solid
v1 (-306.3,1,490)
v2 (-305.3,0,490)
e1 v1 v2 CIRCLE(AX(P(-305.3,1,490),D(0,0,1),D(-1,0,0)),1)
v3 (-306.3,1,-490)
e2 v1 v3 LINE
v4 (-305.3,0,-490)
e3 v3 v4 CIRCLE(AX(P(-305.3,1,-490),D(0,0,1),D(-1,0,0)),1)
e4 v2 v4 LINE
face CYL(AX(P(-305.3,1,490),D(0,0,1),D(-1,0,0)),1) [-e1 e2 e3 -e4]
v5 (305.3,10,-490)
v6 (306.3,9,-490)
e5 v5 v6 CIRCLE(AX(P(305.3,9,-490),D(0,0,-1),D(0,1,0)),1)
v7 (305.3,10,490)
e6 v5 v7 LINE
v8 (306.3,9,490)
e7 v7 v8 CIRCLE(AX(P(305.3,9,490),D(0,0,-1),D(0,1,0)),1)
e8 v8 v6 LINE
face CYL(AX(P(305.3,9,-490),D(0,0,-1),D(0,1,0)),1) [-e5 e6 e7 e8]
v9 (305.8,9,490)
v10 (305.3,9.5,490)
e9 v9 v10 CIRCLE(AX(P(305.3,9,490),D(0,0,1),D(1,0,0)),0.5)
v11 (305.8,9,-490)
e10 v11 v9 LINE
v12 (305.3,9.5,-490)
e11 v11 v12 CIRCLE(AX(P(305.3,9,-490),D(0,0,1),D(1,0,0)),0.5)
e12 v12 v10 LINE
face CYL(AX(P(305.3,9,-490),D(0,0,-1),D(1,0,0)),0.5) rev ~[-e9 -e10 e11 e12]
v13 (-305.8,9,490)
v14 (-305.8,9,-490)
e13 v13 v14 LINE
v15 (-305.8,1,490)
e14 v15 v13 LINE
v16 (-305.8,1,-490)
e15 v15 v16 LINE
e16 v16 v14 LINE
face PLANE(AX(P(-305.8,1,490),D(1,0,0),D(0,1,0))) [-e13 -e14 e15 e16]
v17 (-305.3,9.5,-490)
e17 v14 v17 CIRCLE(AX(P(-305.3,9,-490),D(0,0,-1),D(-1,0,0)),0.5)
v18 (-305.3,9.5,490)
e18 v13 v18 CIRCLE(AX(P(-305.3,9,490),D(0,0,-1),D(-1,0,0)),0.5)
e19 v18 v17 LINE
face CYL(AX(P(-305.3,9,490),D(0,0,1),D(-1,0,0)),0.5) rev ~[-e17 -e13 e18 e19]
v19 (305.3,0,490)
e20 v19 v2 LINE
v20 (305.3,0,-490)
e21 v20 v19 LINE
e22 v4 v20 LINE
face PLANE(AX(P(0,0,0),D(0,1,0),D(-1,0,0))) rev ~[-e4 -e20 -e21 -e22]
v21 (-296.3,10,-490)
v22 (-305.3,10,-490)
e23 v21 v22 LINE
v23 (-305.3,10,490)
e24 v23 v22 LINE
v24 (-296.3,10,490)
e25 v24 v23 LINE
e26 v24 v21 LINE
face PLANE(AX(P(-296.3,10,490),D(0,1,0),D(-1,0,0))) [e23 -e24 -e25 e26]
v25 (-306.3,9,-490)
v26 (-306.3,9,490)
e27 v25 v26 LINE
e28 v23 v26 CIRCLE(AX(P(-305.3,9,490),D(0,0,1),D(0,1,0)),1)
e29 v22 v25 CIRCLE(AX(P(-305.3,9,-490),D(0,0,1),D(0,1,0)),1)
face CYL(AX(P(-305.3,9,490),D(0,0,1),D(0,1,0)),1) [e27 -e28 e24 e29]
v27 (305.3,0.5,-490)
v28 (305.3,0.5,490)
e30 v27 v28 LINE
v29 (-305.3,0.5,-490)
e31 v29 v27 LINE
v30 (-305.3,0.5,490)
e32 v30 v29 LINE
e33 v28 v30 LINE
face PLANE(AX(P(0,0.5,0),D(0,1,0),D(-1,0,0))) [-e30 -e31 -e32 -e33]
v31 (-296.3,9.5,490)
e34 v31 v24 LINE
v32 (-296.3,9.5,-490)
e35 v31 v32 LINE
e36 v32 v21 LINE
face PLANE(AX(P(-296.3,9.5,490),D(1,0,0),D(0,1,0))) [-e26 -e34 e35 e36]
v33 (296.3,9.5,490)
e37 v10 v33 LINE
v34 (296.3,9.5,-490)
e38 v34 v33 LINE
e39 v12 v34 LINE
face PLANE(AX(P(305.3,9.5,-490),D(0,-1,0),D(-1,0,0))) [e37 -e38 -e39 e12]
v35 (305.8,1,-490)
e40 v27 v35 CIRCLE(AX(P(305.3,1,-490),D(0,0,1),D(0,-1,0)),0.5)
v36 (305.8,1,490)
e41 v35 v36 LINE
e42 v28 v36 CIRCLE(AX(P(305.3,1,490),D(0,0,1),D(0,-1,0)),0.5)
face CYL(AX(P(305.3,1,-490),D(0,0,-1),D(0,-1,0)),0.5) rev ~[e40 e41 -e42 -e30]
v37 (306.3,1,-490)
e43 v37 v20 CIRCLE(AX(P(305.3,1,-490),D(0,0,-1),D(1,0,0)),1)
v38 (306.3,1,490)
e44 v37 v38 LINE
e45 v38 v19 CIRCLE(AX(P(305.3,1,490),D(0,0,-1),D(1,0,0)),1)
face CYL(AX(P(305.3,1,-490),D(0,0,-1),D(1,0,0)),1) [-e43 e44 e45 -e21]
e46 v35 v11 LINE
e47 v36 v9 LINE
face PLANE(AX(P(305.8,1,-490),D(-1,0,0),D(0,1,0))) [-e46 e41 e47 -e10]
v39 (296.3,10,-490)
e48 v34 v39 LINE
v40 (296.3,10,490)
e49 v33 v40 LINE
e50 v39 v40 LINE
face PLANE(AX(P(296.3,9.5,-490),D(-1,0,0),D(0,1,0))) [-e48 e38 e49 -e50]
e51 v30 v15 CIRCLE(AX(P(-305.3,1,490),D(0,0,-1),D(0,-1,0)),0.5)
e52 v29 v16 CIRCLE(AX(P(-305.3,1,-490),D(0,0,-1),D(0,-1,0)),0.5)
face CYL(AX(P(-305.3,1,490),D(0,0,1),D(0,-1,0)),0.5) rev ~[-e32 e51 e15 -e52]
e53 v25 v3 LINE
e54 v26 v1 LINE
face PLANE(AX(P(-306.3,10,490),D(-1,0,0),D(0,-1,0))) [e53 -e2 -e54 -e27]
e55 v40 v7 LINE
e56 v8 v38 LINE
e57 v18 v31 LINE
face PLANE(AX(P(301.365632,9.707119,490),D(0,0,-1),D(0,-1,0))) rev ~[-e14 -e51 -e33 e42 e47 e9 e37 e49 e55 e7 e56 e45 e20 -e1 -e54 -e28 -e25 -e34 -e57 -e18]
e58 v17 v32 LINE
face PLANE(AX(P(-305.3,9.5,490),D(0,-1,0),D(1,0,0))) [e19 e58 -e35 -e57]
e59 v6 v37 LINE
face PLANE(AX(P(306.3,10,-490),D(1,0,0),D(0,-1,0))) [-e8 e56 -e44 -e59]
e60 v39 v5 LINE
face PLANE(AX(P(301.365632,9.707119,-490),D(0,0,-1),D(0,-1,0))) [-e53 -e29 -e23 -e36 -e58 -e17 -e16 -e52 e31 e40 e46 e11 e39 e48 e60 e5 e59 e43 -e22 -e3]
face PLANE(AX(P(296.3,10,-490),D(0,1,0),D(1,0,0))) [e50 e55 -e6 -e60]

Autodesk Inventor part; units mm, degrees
ref_plane "YZ Plane" through (0, 0, 0) normal (1, 0, 0) x (0, 1, 0)
ref_plane "XZ Plane" through (0, 0, 0) normal (0, 1, 0) x (-1, 0, 0)
ref_plane "XY Plane" through (0, 0, 0) normal (0, 0, 1) x (1, 0, 0)
sketch "Sketch6" plane through (0, 0, 0) normal (0, 1, 0) x (-1, 0, 0)
  line L0 (306.3, -490) -> (-306.3, -490)
  line L1 (-306.3, -490) -> (-306.3, 490)
  line L2 (-306.3, 490) -> (306.3, 490)
  line L3 (306.3, 490) -> (306.3, -490)
  line L4 (306.3, -490) -> (-306.3, 490) construction
  line L5 (-306.3, -490) -> (306.3, 490) construction
  point P0 (0, 0)
  dimension "d52" = 612.6
  dimension "d53" = 980
extrude "Plate2" add sketch "Sketch6" along normal blind 0.5
sketch "Sketch11" plane through (-305.8, 0, 490) normal (-1, 0, 0) x (0, -1, 0)
  line L0 (0, -980) -> (0, 0)
  line L1 (0, 0) -> (-10, 0)
  line L2 (-10, 0) -> (-10, -980)
  line L3 (-10, -980) -> (0, -980)
edge flange "Flange2" height 10 angle 90 thickness 0.5 bend radius 0.5 thickness toward (-1, 0, 0) relief tear relief width 0.5 relief depth 0.25 edges at (-306.3, 0.5, 0) wall of the first edge with corners at (-305.8, 0, -490) (-305.8, 0, 490) (-305.8, 10, 490) (-305.8, 10, -490)
bend "Bend3"
corner "Corner3"
sketch "Sketch12" plane through (-306.3, 9.5, 490) normal (0, 1, 0) x (-1, 0, 0)
  line L0 (0, -980) -> (0, 0)
  line L1 (0, 0) -> (-10, 0)
  line L2 (-10, 0) -> (-10, -980)
  line L3 (-10, -980) -> (0, -980)
edge flange "Flange3" height 10 angle 90 thickness 0.5 bend radius 0.5 thickness toward (0, 1, 0) relief tear relief width 0.5 relief depth 0.25 edges at (-305.8, 10, 0) wall of the first edge with corners at (-306.3, 9.5, -490) (-306.3, 9.5, 490) (-296.3, 9.5, 490) (-296.3, 9.5, -490)
bend "Bend4"
corner "Corner4"
sketch "Sketch13" plane through (305.8, 0, -490) normal (1, 0, 0) x (0, 1, 0)
  line L0 (0, 980) -> (0, 0)
  line L1 (0, 0) -> (10, 0)
  line L2 (10, 0) -> (10, 980)
  line L3 (10, 980) -> (0, 980)
edge flange "Flange4" height 10 angle 90 thickness 0.5 bend radius 0.5 thickness toward (1, 0, 0) relief tear relief width 0.5 relief depth 0.25 edges at (306.3, 0.5, 0) wall of the first edge with corners at (305.8, 0, 490) (305.8, 0, -490) (305.8, 10, -490) (305.8, 10, 490)
bend "Bend5"
corner "Corner5"
sketch "Sketch14" plane through (306.3, 9.5, -490) normal (0, 1, 0) x (-1, 0, 0)
  line L0 (0, 980) -> (0, 0)
  line L1 (0, 0) -> (10, 0)
  line L2 (10, 0) -> (10, 980)
  line L3 (10, 980) -> (0, 980)
edge flange "Flange5" height 10 angle 90 thickness 0.5 bend radius 0.5 thickness toward (0, 1, 0) relief tear relief width 0.5 relief depth 0.25 edges at (305.8, 10, 0) wall of the first edge with corners at (306.3, 9.5, 490) (306.3, 9.5, -490) (296.3, 9.5, -490) (296.3, 9.5, 490)
bend "Bend6"
corner "Corner6"
equation "\"d52\" = ЖАБРЫ_базовая_ширина - 3 * ЖАБРЫ_шаг_листов"
equation "\"d53\" = ЖАБРЫ_базовая_длина_кор_лист"
equation "\"d54\" = Thickness"
equation "\"d84\" = BendReliefWidth"
equation "\"d85\" = BendReliefDepth"
equation "\"d86\" = MinimumRemnant"
equation "\"d87\" = TransitionRadius"
equation "\"d90\" = BendRadius"
equation "\"d91\" = CornerReliefSize"
equation "\"d92\" = GapSize"
equation "\"d93\" = JacobiRadiusSize"
equation "\"d94\" = BendReliefWidth"
equation "\"d95\" = BendReliefDepth"
equation "\"d96\" = MinimumRemnant"
equation "\"d97\" = TransitionRadius"
equation "\"d100\" = BendRadius"
equation "\"d101\" = CornerReliefSize"
equation "\"d102\" = GapSize"
equation "\"d103\" = JacobiRadiusSize"
equation "\"d104\" = BendReliefWidth"
equation "\"d105\" = BendReliefDepth"
equation "\"d106\" = MinimumRemnant"
equation "\"d107\" = TransitionRadius"
equation "\"d110\" = BendRadius"
equation "\"d111\" = CornerReliefSize"
equation "\"d112\" = GapSize"
equation "\"d113\" = JacobiRadiusSize"
equation "\"d114\" = BendReliefWidth"
equation "\"d115\" = BendReliefDepth"
equation "\"d116\" = MinimumRemnant"
equation "\"d117\" = TransitionRadius"
equation "\"d120\" = BendRadius"
equation "\"d121\" = CornerReliefSize"
equation "\"d122\" = GapSize"
equation "\"d123\" = JacobiRadiusSize"
equation "\"BendRadius\" = Thickness"
equation "\"BendReliefWidth\" = Thickness"
equation "\"BendReliefDepth\" = 0.5 * Thickness"
equation "\"CornerReliefSize\" = 4 * Thickness"
equation "\"MinimumRemnant\" = 2 * Thickness"
equation "\"TransitionRadius\" = BendRadius"
equation "\"JacobiRadiusSize\" = BendRadius"
equation "\"GapSize\" = Thickness"
equation "\"ЖАБРЫ_базовая_ширина\" = 915"
equation "\"ЖАБРЫ_шаг_листов\" = 100.8"
equation "\"ЖАБРЫ_базовая_длина_кор_лист\" = 980"
equation "\"Thickness\" = 0.5"
properties part number "MSC 807 sheet gills" material "Stainless Steel"
